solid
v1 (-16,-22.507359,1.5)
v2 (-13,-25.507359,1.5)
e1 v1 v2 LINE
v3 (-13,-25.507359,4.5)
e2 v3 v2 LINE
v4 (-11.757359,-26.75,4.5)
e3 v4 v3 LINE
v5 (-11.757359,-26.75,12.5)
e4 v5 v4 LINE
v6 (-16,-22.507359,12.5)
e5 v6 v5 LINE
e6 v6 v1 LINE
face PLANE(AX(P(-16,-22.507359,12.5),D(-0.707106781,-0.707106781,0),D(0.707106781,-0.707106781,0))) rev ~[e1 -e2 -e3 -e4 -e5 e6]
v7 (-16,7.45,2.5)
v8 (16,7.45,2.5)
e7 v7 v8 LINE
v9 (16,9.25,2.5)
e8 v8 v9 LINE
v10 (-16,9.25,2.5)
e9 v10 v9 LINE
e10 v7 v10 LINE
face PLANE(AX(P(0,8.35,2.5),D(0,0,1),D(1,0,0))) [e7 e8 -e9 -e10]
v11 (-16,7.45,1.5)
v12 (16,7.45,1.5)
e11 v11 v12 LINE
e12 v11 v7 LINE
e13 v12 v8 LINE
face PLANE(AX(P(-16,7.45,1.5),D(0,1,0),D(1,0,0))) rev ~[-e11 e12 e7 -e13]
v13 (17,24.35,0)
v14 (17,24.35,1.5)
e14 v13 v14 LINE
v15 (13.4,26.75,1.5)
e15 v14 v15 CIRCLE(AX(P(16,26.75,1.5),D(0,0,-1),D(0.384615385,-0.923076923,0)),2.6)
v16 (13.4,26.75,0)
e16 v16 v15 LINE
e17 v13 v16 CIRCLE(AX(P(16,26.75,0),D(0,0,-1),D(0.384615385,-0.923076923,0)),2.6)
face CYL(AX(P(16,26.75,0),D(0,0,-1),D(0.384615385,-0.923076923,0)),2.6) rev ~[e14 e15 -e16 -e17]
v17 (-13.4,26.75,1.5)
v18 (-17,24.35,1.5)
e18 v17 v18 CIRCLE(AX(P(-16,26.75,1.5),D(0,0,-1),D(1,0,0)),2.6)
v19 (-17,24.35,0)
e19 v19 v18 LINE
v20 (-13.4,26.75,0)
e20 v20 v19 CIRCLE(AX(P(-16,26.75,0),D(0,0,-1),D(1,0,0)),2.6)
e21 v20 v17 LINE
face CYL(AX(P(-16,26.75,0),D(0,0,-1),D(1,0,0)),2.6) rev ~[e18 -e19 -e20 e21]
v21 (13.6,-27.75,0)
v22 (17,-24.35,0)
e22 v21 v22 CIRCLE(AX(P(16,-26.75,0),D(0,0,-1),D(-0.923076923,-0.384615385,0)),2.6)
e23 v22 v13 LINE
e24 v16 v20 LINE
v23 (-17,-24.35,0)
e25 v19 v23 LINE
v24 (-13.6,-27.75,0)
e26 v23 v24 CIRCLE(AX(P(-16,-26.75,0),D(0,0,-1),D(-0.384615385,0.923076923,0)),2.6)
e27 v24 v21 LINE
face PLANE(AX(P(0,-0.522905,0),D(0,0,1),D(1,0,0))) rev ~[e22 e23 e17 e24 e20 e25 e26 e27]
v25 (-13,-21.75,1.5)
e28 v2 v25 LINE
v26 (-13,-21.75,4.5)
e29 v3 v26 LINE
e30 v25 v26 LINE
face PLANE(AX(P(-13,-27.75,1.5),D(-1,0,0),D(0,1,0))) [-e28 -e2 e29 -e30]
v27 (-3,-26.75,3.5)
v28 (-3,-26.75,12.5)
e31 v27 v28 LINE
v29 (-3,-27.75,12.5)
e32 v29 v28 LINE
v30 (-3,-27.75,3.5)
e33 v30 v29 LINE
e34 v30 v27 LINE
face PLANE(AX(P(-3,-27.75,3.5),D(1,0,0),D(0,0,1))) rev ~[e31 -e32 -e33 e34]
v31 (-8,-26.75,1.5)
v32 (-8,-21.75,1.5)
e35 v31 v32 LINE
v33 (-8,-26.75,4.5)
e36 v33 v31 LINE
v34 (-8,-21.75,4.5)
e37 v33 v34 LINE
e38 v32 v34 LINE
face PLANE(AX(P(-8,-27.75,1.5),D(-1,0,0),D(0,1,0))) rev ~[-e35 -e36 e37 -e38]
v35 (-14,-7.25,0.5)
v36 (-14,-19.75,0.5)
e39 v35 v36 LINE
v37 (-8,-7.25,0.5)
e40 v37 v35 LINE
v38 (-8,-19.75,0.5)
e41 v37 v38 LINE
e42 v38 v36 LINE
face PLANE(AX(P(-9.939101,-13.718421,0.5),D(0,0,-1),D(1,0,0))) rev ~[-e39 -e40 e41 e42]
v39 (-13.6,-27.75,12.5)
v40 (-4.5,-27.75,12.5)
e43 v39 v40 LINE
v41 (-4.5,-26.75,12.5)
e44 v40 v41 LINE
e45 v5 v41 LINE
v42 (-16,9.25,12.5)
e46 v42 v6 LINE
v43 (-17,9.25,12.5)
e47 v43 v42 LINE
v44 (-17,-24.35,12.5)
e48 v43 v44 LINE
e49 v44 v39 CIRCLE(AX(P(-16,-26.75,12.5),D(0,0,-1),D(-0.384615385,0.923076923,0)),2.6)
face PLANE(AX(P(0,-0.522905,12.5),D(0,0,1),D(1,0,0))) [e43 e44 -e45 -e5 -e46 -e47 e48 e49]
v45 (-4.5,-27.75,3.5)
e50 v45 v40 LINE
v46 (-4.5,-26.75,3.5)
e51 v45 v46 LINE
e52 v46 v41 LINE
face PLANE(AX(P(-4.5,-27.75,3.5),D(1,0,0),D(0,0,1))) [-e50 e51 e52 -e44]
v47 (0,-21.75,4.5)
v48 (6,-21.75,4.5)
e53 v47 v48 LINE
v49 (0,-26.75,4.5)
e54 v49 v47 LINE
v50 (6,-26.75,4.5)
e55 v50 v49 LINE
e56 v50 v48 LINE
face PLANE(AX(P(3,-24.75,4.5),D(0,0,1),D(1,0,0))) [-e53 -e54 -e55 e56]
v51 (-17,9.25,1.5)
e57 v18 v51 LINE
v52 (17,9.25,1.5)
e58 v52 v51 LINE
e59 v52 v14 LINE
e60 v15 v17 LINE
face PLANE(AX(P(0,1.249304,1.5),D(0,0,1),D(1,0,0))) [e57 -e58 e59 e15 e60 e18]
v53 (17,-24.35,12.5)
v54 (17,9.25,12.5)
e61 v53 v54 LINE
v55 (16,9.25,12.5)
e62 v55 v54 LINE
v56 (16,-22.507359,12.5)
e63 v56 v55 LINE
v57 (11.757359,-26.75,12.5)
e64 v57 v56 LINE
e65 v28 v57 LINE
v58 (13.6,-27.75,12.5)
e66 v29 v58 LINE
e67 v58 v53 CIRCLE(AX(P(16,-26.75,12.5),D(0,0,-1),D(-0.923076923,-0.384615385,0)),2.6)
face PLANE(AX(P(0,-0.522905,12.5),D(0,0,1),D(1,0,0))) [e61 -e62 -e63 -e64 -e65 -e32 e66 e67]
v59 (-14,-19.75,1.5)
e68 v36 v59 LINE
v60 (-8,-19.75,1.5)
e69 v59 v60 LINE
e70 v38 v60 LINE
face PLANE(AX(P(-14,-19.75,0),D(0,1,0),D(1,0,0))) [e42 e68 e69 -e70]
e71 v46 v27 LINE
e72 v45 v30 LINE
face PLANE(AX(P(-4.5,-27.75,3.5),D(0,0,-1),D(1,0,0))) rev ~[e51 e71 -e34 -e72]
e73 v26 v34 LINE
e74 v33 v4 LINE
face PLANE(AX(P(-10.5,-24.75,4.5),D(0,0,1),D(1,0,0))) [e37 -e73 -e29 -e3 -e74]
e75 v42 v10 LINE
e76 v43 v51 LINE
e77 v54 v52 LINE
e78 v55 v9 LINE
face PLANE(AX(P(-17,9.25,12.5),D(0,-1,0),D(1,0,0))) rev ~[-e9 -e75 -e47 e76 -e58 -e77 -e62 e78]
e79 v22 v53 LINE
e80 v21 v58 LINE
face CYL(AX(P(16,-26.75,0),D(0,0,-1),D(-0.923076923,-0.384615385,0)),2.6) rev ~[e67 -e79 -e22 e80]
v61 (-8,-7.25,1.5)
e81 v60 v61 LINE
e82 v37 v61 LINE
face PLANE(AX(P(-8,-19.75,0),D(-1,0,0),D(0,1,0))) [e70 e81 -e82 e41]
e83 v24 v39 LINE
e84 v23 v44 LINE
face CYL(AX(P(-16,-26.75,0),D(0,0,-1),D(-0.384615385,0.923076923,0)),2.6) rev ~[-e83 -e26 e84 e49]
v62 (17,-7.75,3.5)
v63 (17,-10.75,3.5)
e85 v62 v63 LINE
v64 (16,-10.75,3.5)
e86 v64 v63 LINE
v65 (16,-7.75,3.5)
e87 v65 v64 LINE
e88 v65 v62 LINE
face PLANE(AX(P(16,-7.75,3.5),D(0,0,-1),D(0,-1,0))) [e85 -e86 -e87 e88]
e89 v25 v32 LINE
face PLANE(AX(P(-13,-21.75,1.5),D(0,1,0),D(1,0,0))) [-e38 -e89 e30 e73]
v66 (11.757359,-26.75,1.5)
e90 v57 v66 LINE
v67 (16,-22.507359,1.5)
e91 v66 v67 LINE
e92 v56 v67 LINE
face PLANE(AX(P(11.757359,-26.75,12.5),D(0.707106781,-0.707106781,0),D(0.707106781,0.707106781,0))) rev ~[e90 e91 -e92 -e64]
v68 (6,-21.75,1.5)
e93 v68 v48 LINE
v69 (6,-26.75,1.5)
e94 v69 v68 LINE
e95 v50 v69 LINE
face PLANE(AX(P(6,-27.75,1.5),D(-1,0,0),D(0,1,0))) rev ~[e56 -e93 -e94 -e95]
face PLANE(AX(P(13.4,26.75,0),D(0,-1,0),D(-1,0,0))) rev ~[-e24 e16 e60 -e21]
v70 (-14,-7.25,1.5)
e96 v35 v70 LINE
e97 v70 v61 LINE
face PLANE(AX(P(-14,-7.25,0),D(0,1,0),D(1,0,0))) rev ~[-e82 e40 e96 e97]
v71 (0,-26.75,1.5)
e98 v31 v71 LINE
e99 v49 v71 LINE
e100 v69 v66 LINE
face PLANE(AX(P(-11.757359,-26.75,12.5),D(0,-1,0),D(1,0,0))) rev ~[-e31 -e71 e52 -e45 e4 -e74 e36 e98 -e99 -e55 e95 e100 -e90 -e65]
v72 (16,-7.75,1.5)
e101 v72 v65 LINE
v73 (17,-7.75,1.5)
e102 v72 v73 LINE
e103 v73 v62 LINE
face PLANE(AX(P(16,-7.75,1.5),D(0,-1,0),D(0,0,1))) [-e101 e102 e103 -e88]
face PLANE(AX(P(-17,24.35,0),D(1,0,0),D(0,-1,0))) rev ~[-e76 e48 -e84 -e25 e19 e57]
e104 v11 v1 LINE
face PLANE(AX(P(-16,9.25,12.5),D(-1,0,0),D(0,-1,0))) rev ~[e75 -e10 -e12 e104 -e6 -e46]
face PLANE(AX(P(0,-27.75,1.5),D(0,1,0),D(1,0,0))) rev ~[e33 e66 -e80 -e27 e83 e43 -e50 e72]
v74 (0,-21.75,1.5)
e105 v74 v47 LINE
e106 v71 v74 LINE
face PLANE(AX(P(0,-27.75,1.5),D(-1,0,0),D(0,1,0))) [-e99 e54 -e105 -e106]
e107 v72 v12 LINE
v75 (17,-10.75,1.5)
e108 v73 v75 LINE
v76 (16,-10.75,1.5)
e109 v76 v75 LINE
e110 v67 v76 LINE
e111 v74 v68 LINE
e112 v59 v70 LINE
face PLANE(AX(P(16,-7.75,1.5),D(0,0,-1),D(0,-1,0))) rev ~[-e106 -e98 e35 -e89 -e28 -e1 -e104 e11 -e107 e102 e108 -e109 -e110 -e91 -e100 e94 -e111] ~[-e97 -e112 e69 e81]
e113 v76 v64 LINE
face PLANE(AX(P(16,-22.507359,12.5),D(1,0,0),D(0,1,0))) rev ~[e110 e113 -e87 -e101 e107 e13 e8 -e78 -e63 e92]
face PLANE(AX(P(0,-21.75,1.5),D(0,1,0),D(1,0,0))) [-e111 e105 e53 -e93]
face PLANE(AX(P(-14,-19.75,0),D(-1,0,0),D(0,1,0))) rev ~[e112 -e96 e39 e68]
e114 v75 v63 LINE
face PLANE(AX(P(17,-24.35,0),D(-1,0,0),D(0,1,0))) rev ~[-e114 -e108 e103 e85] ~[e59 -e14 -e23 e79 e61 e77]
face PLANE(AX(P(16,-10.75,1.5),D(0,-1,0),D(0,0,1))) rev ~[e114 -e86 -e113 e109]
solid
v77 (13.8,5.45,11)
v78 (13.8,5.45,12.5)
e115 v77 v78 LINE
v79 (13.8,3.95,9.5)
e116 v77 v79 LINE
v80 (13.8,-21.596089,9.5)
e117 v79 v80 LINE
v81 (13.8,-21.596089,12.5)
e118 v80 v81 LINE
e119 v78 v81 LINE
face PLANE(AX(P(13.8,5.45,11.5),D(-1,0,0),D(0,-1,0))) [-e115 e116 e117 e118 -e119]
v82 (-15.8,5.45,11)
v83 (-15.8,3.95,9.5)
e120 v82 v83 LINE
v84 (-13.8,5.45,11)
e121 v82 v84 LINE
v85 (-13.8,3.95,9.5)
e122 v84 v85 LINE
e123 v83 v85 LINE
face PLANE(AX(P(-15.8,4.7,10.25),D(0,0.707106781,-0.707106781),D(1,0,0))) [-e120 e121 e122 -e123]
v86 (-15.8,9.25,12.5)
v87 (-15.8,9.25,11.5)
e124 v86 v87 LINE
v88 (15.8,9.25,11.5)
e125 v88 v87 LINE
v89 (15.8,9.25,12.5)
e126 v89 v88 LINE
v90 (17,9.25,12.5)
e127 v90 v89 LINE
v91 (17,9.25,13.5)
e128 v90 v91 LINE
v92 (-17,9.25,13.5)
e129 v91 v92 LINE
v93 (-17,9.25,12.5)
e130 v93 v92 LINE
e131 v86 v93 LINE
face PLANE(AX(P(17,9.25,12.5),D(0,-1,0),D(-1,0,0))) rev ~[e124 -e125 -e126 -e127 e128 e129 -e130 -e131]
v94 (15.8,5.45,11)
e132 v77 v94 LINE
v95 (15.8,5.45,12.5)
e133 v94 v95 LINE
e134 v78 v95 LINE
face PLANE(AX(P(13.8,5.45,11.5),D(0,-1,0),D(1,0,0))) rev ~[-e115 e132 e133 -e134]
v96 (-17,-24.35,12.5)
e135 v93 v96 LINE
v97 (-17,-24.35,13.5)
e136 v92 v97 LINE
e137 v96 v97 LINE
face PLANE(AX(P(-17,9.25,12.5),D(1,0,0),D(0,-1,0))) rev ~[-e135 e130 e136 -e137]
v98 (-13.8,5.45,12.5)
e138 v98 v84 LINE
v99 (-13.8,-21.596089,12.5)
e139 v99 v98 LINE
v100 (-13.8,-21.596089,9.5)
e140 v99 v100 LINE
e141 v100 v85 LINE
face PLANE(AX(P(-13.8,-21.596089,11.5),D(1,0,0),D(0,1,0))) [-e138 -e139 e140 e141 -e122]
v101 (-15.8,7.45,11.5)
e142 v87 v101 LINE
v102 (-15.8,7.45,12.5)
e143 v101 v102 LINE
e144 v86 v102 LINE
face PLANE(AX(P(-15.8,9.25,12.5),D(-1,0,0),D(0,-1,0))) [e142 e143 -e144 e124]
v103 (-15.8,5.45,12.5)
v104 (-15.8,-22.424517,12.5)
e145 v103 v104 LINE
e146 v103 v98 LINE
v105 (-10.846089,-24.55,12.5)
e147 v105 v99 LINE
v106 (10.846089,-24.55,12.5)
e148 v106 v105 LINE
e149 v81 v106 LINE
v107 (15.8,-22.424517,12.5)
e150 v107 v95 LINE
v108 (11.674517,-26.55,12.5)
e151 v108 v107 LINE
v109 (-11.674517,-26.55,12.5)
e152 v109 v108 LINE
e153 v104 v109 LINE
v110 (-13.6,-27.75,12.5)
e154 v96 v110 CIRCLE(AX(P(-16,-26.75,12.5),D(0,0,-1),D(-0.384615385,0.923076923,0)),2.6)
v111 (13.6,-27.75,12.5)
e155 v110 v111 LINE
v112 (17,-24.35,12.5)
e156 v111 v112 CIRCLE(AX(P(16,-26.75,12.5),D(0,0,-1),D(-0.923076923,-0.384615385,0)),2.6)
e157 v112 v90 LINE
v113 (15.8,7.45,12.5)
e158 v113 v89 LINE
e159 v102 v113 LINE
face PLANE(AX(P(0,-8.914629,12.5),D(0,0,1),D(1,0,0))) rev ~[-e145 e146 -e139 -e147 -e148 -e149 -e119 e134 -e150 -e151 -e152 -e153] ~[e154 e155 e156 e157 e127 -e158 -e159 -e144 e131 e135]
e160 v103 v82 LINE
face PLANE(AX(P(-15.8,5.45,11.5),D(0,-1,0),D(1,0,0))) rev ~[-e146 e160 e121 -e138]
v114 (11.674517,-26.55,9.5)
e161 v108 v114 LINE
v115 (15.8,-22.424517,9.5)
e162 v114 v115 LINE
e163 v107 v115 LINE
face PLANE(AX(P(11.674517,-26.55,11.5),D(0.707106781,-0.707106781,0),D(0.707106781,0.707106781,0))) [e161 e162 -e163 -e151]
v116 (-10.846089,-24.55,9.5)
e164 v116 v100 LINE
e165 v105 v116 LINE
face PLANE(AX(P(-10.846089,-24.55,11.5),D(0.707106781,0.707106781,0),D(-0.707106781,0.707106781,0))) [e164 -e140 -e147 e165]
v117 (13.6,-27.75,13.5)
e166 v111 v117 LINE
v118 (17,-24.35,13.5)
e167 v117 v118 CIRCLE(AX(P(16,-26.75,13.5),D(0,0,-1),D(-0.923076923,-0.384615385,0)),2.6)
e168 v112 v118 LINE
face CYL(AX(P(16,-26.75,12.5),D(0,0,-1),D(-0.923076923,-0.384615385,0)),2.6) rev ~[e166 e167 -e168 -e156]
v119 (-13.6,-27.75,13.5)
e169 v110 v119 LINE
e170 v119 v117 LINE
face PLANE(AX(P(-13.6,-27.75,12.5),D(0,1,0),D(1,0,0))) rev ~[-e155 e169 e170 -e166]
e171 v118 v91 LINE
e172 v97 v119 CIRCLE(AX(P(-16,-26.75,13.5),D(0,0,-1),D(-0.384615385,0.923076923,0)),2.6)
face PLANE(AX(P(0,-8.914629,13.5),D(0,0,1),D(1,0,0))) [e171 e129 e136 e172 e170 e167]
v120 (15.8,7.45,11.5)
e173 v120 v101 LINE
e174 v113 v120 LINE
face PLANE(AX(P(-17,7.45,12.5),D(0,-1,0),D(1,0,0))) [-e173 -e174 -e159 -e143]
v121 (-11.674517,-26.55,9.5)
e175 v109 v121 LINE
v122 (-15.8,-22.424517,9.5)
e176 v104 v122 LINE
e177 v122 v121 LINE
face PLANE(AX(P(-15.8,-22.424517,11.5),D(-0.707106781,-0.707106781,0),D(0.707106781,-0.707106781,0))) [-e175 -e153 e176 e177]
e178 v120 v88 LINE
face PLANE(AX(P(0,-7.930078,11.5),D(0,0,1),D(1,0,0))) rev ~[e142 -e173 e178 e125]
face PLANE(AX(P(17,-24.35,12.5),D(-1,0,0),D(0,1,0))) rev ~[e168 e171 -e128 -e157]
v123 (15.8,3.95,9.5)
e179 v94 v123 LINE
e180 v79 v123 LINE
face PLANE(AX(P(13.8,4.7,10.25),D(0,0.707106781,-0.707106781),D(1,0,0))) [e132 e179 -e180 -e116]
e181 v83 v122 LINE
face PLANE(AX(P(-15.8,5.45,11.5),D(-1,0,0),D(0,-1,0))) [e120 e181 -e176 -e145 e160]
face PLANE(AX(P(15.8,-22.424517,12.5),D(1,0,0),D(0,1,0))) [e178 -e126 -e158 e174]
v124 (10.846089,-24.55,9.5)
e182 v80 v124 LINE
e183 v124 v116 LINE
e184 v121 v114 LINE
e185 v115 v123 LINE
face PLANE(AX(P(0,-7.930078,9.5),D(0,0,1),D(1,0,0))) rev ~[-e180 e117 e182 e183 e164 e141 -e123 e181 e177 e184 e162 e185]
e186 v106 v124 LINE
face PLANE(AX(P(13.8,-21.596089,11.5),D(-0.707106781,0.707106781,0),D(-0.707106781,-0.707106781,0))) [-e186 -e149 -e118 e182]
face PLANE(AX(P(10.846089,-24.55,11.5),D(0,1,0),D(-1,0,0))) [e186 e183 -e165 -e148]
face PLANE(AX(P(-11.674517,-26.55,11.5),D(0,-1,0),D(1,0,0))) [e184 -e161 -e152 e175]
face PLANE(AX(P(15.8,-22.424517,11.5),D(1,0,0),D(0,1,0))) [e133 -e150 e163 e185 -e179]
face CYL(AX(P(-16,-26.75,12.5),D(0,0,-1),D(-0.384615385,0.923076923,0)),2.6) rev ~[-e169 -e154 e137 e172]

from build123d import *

# Parameters (mm, degrees)
F1_W      = 6
F1_H      = 12.5
F2_DEPTH  = 12.5
F4_DEPTH  = 11
F5_W      = 6
F5_H      = 6
F5_W_2    = 5
F6_DEPTH  = 3
F7_W      = 32
F7_H      = 1.8
F8_DEPTH  = 1
F10_DEPTH = 1
F12_DEPTH = 1
F13_W     = 1.5
F13_H     = 9
F14_DEPTH = 1
F15_W     = 34
F15_H     = 2
F16_DEPTH = 25
F17_DEPTH = 2
F18_SIZE  = 1.5
F19_W     = 9.7393654287
F19_H     = 17.2347798944
F20_DEPTH = 0.5
F21_W     = 3
F21_H     = 2
F22_DEPTH = 1


with BuildPart() as f2:
    # F1 (on Top) → F2 (new body)
    with BuildSketch(Plane.XY):
        with BuildLine():
            ThreePointArc((-13.4, 26.75), (-14.5577794898, 24.5866692347), (-17, 24.35))
            Line((-17, 24.35), (-17, -24.35))
            ThreePointArc((-17, -24.35), (-14.1615223689, -24.9115223689), (-13.6, -27.75))
            Line((-13.6, -27.75), (13.6, -27.75))
            ThreePointArc((13.6, -27.75), (14.1615223689, -24.9115223689), (17, -24.35))
            Line((17, -24.35), (17, 24.35))
            ThreePointArc((17, 24.35), (14.5577794898, 24.5866692347), (13.4, 26.75))
            Line((13.4, 26.75), (-13.4, 26.75))
        make_face()
        with Locations((-11, -13.5)):
            Rectangle(F1_W, F1_H, mode=Mode.SUBTRACT)
    extrude(amount=F2_DEPTH)

    # F3 (on face) → F4 (cut)
    with BuildSketch(Plane.XY.offset(12.5)):
        Polygon((-17, 9.25), (-16, 9.25), (-16, -22.5073593129), (-11.7573593129, -26.75), (11.7573593129, -26.75), (16, -22.5073593129), (16, 9.25), (17, 9.25), (17, 26.75), (-17, 26.75), align=None)
    extrude(amount=-F4_DEPTH, mode=Mode.SUBTRACT)

    # F5 (on face) → F6 (join)
    with BuildSketch(Plane.XY.offset(1.5)):
        with Locations((3, -24.75)):
            Rectangle(F5_W, F5_H)
        with Locations((-10.5, -24.75)):
            Rectangle(F5_W_2, F5_H)
    extrude(amount=F6_DEPTH)

    # F7 (on face) → F8 (join)
    with BuildSketch(Plane.XY.offset(1.5)):
        with Locations((0, 8.35)):
            Rectangle(F7_W, F7_H)
    extrude(amount=F8_DEPTH)

    # F13 (on face) → F14 (cut, through all)
    with BuildSketch(Plane.XZ.offset(27.75)):
        with Locations((-3.75, 8)):
            Rectangle(F13_W, F13_H)
    extrude(amount=-F14_DEPTH, mode=Mode.SUBTRACT)

    # F19 (on face) → F20 (join)
    with BuildSketch(Plane(origin=(0, 0, 0), x_dir=(1, 0, 0), z_dir=(0, 0, -1))):
        with Locations((-9.9391005933, 13.7184206396)):
            Rectangle(F19_W, F19_H)
    extrude(amount=-F20_DEPTH)

    # F21 (on face) → F22 (cut, through all)
    with BuildSketch(Plane(origin=(16, 0, 0), x_dir=(0, -1, 0), z_dir=(-1, 0, 0))):
        with Locations((9.25, 2.5)):
            Rectangle(F21_W, F21_H)
    extrude(amount=-F22_DEPTH, mode=Mode.SUBTRACT)


with BuildPart() as f10:
    # F9 (on face) → F10 (new body)
    with BuildSketch(Plane.XY.offset(12.5)):
        with BuildLine():
            Line((17, 9.25), (-17, 9.25))
            Line((-17, 9.25), (-17, -24.35))
            ThreePointArc((-17, -24.35), (-14.1615223689, -24.9115223689), (-13.6, -27.75))
            Line((-13.6, -27.75), (13.6, -27.75))
            ThreePointArc((13.6, -27.75), (14.1615223689, -24.9115223689), (17, -24.35))
            Line((17, -24.35), (17, 9.25))
        make_face()
    extrude(amount=F10_DEPTH)

    # F11 (on face) → F12 (join)
    with BuildSketch(Plane.XY.offset(12.5)):
        Polygon((15.8, 9.25), (-15.8, 9.25), (-15.8, -22.4245166004), (-11.6745166004, -26.55), (11.6745166004, -26.55), (15.8, -22.4245166004), align=None)
        Polygon((13.8, 7.45), (13.8, -21.5960894757), (10.8460894757, -24.55), (-10.8460894757, -24.55), (-13.8, -21.5960894757), (-13.8, 7.45), align=None, mode=Mode.SUBTRACT)
    extrude(amount=-F12_DEPTH)

    # F15 (on face) → F16 (cut)
    with BuildSketch(Plane(origin=(0, 0, 12.5), x_dir=(1, 0, 0), z_dir=(0, 0, -1))):
        with Locations((0, -6.45)):
            Rectangle(F15_W, F15_H)
    extrude(amount=F16_DEPTH, mode=Mode.SUBTRACT)

    # F17 (add): a face of the model
    f17_faces = [f10.faces().sort_by_distance(p)[0] for p in [
        (13.419252011, -24.169252011, 11.5),
    ]]
    extrude(f17_faces, amount=F17_DEPTH)

    # F18
    f18_edges = [f10.edges().sort_by_distance(p)[0] for p in [
        (-14.8, 5.45, 9.5),
        (14.8, 5.45, 9.5),
    ]]
    chamfer(f18_edges, length=F18_SIZE)


solid = Compound([f2.part, f10.part])
